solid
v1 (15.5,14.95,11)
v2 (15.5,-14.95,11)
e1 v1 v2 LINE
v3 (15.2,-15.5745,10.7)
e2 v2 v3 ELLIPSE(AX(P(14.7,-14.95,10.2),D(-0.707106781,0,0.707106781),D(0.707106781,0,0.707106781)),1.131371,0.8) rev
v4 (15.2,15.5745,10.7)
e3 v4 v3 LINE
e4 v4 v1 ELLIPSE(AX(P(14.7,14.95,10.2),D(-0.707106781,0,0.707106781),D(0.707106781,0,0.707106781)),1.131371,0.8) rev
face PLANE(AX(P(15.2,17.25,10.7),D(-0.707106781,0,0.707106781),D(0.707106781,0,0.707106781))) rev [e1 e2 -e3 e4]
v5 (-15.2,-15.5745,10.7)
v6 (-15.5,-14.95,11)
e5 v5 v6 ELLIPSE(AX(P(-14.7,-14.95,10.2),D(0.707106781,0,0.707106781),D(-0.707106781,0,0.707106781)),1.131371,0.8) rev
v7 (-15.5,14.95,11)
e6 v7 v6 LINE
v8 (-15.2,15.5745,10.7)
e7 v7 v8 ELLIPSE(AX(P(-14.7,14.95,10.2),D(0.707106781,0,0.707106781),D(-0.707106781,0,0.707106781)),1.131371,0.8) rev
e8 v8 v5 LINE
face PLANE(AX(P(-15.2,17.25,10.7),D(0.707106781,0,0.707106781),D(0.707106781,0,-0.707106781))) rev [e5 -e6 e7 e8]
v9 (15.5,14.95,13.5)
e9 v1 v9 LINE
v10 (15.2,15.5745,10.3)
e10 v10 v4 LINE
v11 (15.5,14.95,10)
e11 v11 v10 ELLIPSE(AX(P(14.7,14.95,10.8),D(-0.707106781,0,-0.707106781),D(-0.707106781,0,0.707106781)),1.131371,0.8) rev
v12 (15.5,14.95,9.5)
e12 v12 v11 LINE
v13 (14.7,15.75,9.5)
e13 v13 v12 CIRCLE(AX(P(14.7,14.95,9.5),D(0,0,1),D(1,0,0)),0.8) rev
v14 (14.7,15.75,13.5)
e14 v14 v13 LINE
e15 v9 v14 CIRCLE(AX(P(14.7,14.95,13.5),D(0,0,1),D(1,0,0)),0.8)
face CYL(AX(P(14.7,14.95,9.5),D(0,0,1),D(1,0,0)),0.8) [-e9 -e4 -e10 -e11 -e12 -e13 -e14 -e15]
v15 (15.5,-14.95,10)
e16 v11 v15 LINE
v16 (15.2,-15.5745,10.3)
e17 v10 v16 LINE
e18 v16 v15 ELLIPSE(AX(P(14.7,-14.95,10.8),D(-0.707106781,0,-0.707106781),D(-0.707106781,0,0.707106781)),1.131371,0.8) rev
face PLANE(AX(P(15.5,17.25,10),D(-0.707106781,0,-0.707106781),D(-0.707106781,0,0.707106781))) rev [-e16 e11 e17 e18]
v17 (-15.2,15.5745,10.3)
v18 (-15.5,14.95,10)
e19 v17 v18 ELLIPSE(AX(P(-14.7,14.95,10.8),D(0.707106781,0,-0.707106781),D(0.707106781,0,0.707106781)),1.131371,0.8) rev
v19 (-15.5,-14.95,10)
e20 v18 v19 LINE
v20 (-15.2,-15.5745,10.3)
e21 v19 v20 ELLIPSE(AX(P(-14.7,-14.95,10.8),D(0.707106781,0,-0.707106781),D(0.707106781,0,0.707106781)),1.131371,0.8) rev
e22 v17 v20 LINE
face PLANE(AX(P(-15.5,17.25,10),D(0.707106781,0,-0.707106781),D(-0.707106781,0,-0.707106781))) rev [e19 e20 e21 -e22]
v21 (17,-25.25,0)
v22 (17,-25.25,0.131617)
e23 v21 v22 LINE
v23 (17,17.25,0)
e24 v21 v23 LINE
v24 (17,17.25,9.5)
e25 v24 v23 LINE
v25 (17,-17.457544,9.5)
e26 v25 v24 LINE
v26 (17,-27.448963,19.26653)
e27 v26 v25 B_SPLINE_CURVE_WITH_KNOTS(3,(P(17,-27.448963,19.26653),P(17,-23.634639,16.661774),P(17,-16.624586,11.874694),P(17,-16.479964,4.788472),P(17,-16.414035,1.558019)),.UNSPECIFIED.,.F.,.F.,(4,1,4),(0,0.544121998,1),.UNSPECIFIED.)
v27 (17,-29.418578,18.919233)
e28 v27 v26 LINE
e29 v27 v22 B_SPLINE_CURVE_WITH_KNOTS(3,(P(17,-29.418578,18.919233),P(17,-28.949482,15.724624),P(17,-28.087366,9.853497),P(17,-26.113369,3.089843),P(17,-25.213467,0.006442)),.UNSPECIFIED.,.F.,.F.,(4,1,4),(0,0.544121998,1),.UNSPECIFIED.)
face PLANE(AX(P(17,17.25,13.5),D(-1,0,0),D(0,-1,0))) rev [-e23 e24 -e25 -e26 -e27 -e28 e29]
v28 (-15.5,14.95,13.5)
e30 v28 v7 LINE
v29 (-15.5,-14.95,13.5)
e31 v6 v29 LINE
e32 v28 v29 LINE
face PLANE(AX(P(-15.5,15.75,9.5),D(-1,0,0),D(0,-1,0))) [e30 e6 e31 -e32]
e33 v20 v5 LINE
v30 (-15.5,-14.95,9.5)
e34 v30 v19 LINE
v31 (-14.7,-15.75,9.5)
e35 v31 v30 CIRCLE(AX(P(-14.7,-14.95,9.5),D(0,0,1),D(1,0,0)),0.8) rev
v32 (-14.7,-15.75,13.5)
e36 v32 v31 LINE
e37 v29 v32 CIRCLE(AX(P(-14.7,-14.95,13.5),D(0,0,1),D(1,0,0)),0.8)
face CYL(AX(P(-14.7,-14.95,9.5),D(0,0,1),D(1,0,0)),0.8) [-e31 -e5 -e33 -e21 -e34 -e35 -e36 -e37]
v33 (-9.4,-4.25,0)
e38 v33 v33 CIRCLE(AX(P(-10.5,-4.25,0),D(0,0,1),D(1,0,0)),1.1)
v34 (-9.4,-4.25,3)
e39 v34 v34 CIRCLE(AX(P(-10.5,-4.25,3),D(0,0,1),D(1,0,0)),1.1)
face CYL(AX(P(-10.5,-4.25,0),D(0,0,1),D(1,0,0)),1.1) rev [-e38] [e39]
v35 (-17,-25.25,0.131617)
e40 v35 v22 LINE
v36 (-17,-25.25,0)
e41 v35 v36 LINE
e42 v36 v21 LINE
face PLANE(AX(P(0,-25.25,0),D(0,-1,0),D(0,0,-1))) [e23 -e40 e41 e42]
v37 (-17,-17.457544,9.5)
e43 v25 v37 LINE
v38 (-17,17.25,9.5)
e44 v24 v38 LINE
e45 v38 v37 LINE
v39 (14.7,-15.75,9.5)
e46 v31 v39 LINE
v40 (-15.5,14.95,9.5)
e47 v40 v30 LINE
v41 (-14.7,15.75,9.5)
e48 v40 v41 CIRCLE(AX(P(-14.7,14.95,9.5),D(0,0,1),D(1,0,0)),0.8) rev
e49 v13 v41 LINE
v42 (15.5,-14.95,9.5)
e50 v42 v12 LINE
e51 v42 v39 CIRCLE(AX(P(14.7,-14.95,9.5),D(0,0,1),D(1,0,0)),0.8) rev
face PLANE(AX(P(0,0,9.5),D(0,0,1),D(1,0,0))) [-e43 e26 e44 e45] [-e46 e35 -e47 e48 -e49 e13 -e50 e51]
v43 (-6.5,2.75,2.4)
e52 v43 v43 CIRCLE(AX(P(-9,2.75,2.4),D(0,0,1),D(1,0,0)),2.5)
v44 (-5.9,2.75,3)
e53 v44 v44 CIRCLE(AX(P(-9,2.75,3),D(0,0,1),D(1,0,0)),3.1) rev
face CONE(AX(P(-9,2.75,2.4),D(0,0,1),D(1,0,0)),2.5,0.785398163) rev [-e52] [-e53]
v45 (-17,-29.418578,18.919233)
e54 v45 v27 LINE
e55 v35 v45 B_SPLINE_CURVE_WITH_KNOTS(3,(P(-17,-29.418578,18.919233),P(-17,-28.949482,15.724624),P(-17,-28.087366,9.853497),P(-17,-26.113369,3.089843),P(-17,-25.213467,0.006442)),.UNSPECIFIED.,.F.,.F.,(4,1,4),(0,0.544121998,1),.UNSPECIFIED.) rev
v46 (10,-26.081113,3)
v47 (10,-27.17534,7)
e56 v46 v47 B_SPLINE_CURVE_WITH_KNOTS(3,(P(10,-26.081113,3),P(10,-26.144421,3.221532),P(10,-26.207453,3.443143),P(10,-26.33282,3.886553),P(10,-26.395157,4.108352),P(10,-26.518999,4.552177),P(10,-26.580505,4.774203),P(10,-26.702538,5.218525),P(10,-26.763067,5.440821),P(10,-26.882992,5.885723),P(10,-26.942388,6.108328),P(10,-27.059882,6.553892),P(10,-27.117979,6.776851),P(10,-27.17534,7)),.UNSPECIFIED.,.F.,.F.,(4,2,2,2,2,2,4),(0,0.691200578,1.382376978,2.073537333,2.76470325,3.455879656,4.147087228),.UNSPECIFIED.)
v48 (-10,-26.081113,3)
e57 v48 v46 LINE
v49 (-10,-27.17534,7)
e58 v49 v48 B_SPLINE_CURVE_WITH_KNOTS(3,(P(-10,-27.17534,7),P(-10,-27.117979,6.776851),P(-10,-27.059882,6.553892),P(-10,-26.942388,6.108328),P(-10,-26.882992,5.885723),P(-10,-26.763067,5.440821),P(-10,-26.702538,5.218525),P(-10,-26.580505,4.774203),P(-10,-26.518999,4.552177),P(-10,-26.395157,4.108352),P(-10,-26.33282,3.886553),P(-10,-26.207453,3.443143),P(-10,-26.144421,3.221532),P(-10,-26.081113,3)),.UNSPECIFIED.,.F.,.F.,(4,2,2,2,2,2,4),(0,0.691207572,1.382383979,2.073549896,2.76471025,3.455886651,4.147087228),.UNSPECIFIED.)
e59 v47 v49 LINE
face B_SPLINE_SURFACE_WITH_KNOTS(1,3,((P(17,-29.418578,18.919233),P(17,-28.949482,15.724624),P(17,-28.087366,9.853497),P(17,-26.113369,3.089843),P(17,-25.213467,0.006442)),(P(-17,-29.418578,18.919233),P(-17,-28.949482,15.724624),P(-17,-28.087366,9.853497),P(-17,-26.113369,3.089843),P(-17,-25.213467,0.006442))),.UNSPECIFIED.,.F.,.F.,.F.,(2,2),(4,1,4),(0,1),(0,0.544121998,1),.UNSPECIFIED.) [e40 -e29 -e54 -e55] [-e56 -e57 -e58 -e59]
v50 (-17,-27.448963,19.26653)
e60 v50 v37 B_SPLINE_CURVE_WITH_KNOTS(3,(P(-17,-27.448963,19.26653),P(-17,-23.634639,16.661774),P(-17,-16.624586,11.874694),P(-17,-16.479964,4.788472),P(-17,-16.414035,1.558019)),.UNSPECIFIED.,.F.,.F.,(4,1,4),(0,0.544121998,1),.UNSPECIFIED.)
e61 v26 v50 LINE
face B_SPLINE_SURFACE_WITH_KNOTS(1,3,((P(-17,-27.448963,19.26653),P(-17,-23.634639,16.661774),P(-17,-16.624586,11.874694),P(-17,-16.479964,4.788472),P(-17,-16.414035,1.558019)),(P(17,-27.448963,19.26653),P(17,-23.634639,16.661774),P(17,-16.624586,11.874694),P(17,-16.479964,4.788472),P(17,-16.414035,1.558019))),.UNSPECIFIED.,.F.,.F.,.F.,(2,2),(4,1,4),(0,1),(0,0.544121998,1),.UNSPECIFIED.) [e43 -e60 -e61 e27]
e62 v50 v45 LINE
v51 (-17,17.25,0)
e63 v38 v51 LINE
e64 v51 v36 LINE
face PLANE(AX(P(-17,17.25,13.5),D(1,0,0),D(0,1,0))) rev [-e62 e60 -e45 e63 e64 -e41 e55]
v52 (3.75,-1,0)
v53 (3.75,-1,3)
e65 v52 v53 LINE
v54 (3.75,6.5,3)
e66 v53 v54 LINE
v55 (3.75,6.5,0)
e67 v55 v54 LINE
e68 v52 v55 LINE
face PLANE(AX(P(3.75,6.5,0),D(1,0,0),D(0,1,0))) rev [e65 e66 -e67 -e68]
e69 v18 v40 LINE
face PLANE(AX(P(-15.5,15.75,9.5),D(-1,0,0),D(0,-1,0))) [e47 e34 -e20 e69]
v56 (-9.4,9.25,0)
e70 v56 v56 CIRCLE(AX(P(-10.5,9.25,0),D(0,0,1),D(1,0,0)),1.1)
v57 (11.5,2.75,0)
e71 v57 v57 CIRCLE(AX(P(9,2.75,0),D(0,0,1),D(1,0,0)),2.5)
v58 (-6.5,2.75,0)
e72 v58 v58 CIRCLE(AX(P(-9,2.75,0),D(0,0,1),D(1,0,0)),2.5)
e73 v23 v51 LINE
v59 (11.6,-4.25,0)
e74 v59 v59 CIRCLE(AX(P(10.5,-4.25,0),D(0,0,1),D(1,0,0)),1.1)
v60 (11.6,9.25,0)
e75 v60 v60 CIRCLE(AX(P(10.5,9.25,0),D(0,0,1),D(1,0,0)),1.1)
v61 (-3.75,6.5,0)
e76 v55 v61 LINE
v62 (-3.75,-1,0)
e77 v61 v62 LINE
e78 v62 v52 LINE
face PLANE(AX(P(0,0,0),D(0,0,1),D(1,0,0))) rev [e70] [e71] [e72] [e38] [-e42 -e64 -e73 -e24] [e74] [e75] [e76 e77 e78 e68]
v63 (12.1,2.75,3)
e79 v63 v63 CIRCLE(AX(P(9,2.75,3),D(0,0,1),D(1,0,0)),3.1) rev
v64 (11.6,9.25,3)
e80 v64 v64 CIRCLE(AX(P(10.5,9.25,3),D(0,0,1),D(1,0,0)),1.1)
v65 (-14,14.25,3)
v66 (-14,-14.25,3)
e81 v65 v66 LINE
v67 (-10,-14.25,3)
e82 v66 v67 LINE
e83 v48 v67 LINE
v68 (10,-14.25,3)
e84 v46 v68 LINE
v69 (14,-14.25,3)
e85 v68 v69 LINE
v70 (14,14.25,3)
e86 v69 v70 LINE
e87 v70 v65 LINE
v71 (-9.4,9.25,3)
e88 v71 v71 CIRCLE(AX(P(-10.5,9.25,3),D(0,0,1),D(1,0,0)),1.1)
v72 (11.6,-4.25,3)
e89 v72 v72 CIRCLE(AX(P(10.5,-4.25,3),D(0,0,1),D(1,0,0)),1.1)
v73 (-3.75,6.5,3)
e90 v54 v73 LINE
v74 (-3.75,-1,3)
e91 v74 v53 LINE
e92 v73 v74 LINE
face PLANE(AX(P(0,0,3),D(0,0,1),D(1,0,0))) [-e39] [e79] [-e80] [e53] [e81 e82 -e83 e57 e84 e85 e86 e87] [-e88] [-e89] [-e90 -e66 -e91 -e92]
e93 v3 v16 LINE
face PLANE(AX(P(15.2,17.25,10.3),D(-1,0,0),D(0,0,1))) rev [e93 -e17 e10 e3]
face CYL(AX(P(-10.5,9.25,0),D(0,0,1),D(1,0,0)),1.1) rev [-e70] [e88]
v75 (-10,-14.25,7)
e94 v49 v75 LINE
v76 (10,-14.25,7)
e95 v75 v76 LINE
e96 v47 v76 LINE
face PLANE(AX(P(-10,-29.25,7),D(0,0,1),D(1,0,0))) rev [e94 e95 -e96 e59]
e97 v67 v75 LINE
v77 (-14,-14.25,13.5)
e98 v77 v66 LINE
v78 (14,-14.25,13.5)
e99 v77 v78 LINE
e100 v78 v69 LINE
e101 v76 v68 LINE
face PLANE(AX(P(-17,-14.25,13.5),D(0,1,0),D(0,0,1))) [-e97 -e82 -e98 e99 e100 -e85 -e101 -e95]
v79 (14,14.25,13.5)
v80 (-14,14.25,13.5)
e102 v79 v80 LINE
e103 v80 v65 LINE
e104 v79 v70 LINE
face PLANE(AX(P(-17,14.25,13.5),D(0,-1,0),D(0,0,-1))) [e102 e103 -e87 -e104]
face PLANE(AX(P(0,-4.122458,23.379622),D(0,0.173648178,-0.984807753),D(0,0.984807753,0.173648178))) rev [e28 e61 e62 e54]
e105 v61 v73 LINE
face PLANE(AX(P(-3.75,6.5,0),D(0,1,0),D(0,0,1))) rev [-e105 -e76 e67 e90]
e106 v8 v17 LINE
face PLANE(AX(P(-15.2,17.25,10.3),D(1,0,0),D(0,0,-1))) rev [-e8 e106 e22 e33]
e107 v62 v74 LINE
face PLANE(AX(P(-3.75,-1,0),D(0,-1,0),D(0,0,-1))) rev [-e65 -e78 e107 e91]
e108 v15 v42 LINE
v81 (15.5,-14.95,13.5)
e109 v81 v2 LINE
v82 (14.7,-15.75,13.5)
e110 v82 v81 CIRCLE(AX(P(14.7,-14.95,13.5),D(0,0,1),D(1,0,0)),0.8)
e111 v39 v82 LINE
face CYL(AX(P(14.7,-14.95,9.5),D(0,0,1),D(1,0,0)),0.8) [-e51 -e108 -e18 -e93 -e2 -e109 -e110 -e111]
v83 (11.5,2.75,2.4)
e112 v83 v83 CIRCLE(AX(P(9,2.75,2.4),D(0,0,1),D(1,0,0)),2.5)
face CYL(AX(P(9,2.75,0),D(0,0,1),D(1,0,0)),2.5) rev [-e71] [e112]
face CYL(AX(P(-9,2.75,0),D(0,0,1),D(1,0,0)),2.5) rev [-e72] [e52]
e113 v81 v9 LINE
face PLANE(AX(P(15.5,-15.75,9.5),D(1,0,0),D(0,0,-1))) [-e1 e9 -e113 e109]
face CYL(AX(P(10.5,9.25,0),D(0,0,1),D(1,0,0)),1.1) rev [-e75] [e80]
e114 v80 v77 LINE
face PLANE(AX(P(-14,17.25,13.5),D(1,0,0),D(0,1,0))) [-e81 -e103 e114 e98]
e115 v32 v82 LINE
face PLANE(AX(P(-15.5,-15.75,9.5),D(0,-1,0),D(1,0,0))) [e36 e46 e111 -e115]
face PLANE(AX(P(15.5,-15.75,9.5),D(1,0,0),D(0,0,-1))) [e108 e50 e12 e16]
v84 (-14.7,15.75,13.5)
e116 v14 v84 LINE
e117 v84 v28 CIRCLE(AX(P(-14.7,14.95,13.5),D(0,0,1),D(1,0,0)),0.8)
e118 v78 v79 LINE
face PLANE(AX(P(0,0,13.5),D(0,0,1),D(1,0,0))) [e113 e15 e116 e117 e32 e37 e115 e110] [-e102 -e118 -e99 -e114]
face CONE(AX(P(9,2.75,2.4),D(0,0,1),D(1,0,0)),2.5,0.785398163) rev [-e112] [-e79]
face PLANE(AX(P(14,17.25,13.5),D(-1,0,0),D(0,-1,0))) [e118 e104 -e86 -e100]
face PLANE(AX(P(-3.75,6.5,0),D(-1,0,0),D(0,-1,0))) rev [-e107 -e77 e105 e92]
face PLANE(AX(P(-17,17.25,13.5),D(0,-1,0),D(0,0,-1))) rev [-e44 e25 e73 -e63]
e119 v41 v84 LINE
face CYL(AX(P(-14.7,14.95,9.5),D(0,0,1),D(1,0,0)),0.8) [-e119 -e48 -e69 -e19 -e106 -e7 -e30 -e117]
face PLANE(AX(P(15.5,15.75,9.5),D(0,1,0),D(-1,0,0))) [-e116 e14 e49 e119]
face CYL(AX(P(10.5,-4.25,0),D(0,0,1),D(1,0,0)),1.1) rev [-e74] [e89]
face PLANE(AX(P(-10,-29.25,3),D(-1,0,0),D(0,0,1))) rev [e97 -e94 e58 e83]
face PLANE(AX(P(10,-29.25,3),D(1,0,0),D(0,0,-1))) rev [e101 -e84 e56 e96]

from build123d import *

# Parameters (mm, degrees)
SKETCH1_W           = 34
SKETCH1_H           = 34.5
BOSS_EXTRUDE2_DEPTH = 13.5
SHELL1_T            = -3
SKETCH4_R           = 1.1
SKETCH4_R_2         = 2.5
CUT_EXTRUDE2_DEPTH  = 3
CHAMFER1_SIZE       = 0.6
SKETCH5_W           = 7.5
SKETCH5_H           = 7.5
CUT_EXTRUDE4_DEPTH  = 3
SKETCH6_W           = 34
SKETCH6_H           = 34.5
SKETCH6_W_2         = 31
SKETCH6_H_2         = 31.5
CUT_EXTRUDE5_DEPTH  = 4
FILLET1_R           = 0.8
CUT_EXTRUDE6_DEPTH  = 40.5
SKETCH8_W           = 34
SKETCH8_H           = 9.5
BOSS_EXTRUDE3_DEPTH = 8
LOFT1_START         = -17
LOFT1_DEPTH         = 34
SKETCH2_W           = 20
SKETCH2_H           = 4
CUT_EXTRUDE1_DEPTH  = 15


# Read off the part's stored shape, not the designer's step: Loft1
with BuildPart() as part:
    # Sketch1 → Boss-Extrude2 (new body)
    with BuildSketch(Plane.XY):
        Rectangle(SKETCH1_W, SKETCH1_H)
    extrude(amount=BOSS_EXTRUDE2_DEPTH)

    # Shell1
    shell1_openings = [part.faces().sort_by_distance(p)[0] for p in [
        (0, 0, 13.5),
    ]]
    offset(amount=SHELL1_T, openings=shell1_openings, kind=Kind.INTERSECTION)

    # Sketch4 → Cut-Extrude2 (cut)
    with BuildSketch(Plane.XY.offset(3)):
        with Locations((-10.5, 9.25)):
            Circle(SKETCH4_R)
        with Locations((10.5, 9.25)):
            Circle(SKETCH4_R)
        with Locations((10.5, -4.25)):
            Circle(SKETCH4_R)
        with Locations((-10.5, -4.25)):
            Circle(SKETCH4_R)
        with Locations((-9, 2.75)):
            Circle(SKETCH4_R_2)
        with Locations((9, 2.75)):
            Circle(SKETCH4_R_2)
    extrude(amount=-CUT_EXTRUDE2_DEPTH, mode=Mode.SUBTRACT)

    # Chamfer1
    chamfer1_edges = [part.edges().sort_by_distance(p)[0] for p in [
        (-11.5, 2.75, 3),
        (6.5, 2.75, 3),
    ]]
    chamfer(chamfer1_edges, length=CHAMFER1_SIZE)

    # Sketch5 → Cut-Extrude4 (cut)
    with BuildSketch(Plane.XY.offset(3)):
        with Locations((0, 2.75)):
            Rectangle(SKETCH5_W, SKETCH5_H)
    extrude(amount=-CUT_EXTRUDE4_DEPTH, mode=Mode.SUBTRACT)

    # Sketch6 → Cut-Extrude5 (cut)
    with BuildSketch(Plane.XY.offset(13.5)):
        Rectangle(SKETCH6_W, SKETCH6_H)
        Rectangle(SKETCH6_W_2, SKETCH6_H_2, mode=Mode.SUBTRACT)
    extrude(amount=-CUT_EXTRUDE5_DEPTH, mode=Mode.SUBTRACT)

    # Fillet1
    fillet1_edges = [part.edges().sort_by_distance(p)[0] for p in [
        (15.5, -15.75, 11.5),
        (-15.5, -15.75, 11.5),
        (-15.5, 15.75, 11.5),
        (15.5, 15.75, 11.5),
    ]]
    fillet(fillet1_edges, radius=FILLET1_R)

    # Sketch7 → Cut-Extrude6 (cut, through all)
    with BuildSketch(Plane.XZ.offset(15.75)):
        Polygon((-15.5, 10), (-15.2, 10.3), (-15.2, 10.7), (-15.5, 11), align=None)
        Polygon((15.5, 10), (15.2, 10.3), (15.2, 10.7), (15.5, 11), align=None)
    extrude(amount=-CUT_EXTRUDE6_DEPTH, mode=Mode.SUBTRACT)

    # Sketch8 → Boss-Extrude3 (add)
    with BuildSketch(Plane.XZ.offset(17.25)):
        with Locations((0, 4.75)):
            Rectangle(SKETCH8_W, SKETCH8_H)
    extrude(amount=BOSS_EXTRUDE3_DEPTH)

    # Loft1 outline → Loft1 (add)
    with BuildSketch(Plane.YZ.offset(LOFT1_START)):
        with BuildLine():
            add(Edge.make_bspline(
                [(-27.448962768, 19.266529653), (-23.634638761, 16.661774183), (-19.340130821, 13.729106946), (-17.622252945, 9.933560294), (-17.457544345, 9.499999999)],
                knots=[0, 0, 0, 0, 0.544121998, 0.612621328, 0.612621328, 0.612621328, 0.612621328], degree=3))
            Line((-27.448962768, 19.266529653), (-29.418578274, 18.919233298))
            add(Edge.make_bspline(
                [(-29.418578274, 18.919233298), (-28.949482113, 15.724623902), (-28.092684774, 9.889716149), (-26.137682382, 3.173259559), (-25.25, 0.131617347)],
                knots=[0, 0, 0, 0, 0.544121998, 0.993830941, 0.993830941, 0.993830941, 0.993830941], degree=3))
            Line((-25.25, 0.131617347), (-25.25, 9.5))
            Line((-25.25, 9.5), (-17.457544345, 9.499999999))
        make_face()
    extrude(amount=LOFT1_DEPTH)

    # Sketch2 → Cut-Extrude1 (cut)
    with BuildSketch(Plane(origin=(0, -14.25, 0), x_dir=(1, 0, 0), z_dir=(0, 1, 0))):
        with Locations((0, -5)):
            Rectangle(SKETCH2_W, SKETCH2_H)
    extrude(amount=-CUT_EXTRUDE1_DEPTH, mode=Mode.SUBTRACT)


solid = part.part
